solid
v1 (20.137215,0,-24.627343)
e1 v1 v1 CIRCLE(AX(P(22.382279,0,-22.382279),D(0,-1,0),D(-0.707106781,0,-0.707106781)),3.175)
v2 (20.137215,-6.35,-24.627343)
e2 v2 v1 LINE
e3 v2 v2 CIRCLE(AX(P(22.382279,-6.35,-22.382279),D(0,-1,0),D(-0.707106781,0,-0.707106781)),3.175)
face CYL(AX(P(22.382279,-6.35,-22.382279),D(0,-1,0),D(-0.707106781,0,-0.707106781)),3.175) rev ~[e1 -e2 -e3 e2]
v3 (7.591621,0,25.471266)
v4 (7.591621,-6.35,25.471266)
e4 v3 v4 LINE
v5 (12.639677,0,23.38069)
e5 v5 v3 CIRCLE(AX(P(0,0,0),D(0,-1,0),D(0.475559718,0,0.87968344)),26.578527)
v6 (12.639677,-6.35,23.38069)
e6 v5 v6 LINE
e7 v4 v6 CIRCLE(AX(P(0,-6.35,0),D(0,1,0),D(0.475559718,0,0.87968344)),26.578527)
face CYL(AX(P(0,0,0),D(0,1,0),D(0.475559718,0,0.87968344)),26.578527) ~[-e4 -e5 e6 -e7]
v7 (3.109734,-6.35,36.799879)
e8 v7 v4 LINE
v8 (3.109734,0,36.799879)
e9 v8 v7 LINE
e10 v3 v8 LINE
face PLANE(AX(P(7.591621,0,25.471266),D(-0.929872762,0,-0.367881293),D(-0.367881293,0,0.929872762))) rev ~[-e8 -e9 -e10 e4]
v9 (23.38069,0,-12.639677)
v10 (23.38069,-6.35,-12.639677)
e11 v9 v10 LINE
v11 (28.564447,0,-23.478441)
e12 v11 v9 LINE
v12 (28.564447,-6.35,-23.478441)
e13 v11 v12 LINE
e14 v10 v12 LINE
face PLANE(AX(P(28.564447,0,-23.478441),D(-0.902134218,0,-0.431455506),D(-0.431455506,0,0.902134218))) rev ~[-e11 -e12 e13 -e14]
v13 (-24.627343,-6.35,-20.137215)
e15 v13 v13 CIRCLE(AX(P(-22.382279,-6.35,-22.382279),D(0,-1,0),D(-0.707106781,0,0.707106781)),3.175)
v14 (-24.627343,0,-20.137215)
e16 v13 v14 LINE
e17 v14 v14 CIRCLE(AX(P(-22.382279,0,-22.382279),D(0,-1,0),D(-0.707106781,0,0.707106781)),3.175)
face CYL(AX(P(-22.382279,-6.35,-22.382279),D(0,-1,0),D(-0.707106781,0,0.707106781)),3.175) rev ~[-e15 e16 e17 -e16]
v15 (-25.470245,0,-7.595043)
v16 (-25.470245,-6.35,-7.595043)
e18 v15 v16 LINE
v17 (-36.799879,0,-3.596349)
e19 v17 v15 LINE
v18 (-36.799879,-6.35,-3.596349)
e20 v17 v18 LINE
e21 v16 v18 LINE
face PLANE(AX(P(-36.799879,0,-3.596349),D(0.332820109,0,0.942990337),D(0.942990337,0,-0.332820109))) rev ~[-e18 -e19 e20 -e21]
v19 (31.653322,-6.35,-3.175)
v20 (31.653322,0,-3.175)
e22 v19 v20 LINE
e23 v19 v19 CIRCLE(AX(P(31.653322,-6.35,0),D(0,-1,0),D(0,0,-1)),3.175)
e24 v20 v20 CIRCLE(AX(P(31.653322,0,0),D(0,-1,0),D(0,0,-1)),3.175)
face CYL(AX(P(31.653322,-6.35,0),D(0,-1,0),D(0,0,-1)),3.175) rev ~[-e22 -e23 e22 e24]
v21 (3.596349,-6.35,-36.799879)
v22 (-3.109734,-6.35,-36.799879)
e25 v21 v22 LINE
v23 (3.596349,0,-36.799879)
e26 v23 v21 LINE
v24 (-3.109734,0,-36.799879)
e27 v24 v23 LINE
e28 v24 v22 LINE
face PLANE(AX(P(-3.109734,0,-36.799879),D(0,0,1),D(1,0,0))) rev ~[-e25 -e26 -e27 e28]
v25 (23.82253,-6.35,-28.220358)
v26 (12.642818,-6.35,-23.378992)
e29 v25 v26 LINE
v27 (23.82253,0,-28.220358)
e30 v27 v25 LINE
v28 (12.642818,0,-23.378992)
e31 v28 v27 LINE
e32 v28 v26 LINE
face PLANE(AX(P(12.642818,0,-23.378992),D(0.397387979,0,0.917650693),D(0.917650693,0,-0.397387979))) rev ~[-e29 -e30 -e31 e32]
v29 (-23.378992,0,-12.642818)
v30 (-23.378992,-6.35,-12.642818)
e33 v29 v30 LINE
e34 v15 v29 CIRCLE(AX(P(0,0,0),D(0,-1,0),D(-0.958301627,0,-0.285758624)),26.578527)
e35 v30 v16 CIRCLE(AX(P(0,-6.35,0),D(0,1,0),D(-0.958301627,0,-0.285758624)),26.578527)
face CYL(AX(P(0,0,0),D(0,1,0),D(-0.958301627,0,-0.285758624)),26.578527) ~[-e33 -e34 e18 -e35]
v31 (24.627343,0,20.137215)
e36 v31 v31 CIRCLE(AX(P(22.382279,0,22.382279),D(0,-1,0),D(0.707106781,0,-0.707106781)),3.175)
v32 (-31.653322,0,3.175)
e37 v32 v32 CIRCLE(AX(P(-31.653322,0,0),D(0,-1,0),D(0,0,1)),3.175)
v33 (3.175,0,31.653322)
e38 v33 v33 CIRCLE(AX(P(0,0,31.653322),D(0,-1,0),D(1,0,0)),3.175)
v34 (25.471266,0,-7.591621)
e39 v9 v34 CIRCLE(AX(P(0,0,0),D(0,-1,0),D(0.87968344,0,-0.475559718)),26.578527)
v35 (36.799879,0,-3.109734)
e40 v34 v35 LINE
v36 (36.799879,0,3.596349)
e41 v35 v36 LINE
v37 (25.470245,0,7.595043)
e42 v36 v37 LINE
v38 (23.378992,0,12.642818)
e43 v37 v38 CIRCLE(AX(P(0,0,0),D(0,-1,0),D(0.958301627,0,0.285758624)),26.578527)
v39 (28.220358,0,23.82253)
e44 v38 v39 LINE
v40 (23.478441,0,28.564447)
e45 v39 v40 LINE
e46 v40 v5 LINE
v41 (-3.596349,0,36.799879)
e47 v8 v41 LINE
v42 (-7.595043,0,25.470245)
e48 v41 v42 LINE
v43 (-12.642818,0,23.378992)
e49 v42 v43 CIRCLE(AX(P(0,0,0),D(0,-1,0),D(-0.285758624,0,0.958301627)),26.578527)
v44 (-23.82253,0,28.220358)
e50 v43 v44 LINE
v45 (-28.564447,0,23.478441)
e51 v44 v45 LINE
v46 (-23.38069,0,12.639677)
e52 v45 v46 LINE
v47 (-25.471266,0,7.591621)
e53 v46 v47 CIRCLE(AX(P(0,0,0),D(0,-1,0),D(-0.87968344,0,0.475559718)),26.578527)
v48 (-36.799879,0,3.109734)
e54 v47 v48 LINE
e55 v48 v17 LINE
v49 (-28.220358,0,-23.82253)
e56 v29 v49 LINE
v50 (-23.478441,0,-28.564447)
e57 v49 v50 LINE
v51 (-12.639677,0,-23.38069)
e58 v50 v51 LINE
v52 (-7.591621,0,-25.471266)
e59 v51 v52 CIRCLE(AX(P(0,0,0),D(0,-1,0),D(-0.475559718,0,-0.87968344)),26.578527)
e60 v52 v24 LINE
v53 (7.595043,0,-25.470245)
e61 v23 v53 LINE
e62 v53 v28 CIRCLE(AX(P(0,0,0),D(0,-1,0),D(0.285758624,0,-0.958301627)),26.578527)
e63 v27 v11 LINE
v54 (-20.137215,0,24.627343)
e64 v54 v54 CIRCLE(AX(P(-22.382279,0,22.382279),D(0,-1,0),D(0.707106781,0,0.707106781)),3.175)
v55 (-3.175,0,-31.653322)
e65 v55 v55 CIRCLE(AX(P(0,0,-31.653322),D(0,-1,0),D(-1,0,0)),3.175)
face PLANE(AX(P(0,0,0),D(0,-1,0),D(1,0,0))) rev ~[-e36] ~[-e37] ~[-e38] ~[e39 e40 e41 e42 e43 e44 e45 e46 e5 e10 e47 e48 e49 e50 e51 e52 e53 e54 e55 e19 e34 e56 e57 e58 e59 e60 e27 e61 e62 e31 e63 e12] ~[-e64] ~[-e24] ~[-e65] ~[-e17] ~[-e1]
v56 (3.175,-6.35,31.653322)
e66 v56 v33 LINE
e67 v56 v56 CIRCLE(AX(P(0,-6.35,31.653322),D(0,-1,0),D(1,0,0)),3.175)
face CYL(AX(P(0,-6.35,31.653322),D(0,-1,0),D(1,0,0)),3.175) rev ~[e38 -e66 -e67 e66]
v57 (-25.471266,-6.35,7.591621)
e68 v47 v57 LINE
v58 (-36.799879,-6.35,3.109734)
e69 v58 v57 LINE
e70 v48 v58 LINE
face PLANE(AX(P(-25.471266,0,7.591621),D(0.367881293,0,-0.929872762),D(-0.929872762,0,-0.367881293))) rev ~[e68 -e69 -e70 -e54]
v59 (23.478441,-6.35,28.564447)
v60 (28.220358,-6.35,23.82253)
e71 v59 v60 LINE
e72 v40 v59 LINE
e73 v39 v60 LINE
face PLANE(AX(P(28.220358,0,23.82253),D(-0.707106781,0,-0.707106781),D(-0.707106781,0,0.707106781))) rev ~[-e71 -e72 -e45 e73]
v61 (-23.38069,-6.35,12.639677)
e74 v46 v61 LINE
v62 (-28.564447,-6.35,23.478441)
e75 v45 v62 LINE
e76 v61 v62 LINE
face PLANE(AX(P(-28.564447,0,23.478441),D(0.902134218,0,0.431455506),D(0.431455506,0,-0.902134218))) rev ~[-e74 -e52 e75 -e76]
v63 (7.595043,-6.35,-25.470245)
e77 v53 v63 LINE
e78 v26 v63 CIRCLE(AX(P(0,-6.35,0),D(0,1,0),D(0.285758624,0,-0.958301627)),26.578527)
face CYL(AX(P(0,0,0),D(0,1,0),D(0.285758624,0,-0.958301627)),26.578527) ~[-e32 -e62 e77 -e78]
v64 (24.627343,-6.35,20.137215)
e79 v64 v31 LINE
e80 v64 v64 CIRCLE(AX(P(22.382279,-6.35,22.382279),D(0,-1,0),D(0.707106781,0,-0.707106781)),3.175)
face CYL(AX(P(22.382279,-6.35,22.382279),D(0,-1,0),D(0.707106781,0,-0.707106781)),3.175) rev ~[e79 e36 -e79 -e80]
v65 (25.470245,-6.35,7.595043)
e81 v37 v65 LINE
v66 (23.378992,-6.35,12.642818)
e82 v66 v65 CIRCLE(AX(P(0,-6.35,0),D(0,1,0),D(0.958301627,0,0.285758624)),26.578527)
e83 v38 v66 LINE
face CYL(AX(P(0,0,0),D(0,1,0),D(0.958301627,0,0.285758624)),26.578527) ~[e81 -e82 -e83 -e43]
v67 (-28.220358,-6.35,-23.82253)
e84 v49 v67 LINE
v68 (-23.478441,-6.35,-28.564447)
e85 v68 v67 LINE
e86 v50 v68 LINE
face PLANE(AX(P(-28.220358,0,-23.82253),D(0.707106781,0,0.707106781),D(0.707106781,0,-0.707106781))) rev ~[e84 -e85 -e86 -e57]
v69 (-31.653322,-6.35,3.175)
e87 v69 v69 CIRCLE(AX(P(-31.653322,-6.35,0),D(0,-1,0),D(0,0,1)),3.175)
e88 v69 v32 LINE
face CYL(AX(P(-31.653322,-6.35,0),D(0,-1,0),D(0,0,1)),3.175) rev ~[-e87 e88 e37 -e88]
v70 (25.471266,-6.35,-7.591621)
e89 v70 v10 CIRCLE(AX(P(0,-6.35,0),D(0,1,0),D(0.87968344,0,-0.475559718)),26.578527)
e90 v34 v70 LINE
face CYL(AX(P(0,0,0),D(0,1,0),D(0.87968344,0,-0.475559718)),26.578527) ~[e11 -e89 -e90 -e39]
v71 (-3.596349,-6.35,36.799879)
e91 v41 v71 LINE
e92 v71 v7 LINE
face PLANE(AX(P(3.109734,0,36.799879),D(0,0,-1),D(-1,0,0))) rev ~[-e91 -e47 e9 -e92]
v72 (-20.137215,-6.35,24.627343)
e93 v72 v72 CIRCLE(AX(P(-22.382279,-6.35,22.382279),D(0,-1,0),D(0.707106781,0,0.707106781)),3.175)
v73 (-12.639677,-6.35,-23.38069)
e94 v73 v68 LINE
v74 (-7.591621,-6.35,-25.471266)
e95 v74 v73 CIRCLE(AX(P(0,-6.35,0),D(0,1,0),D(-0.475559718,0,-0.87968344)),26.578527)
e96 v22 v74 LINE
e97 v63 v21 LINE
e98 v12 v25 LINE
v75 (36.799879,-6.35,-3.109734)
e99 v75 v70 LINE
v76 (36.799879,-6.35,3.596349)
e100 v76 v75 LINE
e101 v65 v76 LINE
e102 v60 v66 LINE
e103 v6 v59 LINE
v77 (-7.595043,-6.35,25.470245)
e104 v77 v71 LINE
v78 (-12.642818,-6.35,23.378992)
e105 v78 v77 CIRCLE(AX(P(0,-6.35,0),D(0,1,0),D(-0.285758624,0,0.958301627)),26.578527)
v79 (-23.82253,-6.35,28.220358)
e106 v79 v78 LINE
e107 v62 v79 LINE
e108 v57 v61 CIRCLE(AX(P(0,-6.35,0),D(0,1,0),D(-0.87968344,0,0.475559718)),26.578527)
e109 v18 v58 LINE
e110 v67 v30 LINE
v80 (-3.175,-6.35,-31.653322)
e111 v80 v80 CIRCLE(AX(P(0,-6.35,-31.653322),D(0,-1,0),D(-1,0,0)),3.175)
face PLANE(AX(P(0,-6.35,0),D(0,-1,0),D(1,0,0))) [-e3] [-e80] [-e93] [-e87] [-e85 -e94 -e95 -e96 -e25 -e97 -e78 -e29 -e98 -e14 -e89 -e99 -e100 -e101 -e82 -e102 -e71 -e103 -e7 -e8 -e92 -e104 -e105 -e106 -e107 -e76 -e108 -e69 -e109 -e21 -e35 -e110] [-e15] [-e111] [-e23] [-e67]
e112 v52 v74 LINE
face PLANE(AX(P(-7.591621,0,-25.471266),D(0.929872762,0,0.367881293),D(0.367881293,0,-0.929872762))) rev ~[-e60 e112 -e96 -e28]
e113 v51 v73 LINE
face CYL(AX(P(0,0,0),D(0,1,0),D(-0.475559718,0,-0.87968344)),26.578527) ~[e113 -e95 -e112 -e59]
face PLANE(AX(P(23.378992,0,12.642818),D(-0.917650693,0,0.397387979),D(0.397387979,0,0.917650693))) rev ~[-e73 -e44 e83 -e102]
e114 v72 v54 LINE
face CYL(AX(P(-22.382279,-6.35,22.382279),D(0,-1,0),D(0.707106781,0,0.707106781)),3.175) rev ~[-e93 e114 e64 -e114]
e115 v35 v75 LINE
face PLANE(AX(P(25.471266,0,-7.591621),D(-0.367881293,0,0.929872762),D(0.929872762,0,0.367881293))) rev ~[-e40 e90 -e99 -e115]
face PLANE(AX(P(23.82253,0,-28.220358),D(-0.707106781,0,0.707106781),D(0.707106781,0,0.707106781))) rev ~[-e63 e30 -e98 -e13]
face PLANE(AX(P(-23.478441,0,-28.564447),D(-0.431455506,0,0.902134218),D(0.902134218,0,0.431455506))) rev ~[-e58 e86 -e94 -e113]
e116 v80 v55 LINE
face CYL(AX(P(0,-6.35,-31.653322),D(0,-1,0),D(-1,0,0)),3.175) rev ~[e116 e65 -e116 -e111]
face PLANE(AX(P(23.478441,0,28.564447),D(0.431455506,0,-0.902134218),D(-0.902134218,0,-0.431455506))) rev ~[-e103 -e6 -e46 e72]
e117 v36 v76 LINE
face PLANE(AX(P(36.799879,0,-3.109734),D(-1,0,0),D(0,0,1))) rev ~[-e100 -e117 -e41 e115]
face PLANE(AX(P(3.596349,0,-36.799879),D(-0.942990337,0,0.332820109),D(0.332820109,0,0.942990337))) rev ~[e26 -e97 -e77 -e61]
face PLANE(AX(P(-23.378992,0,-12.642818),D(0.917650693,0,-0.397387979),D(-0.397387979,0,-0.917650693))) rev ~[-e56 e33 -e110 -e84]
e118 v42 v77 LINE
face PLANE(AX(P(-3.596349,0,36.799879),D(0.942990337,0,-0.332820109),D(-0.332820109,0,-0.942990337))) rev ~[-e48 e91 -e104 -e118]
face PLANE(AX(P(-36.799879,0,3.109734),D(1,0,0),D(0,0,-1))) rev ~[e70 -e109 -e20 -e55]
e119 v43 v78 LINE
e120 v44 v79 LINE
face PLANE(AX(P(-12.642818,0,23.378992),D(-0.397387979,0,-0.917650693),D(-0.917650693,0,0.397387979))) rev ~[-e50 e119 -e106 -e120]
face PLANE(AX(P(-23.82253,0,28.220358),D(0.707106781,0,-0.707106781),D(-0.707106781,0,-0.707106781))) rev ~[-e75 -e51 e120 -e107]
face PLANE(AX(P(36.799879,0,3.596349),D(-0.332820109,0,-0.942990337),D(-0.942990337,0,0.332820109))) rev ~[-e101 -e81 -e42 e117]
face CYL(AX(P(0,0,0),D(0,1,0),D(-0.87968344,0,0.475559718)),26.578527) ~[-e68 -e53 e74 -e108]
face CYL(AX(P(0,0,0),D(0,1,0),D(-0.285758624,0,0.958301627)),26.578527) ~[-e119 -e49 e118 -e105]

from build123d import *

# Parameters (mm, degrees)
F0_R            = 38.1
F1_DEPTH        = 6.35
F2_R            = 3.175
F3_DEPTH        = 6.351
F3_COPIES_COUNT = 8
F5_DEPTH        = 25.4


# Not quite as in the source:
# - a pattern or mirror of a feature is missing from the dataset's text; its kind, count and spacing are read off the source's solid


with BuildPart() as f1:
    # F0 (on Front) → F1 (new body)
    with BuildSketch(Plane.XZ):
        Circle(F0_R)
    extrude(amount=F1_DEPTH)

    # F2 (on face) → F3 (cut, through all)
    with BuildSketch(Plane.XZ.offset(6.35)):
        with Locations((0, 31.6533222795)):
            Circle(F2_R)
    f3 = extrude(amount=-F3_DEPTH, mode=Mode.SUBTRACT)

    # F3_copies: F3 ×8 about axis
    f3_copies_axis = Axis((0, 0, 0), (0, 1, 0))
    for i in range(1, F3_COPIES_COUNT):
        add(f3.rotate(f3_copies_axis, i * 360 / F3_COPIES_COUNT), mode=Mode.SUBTRACT)

    # F4 (on Front) → F5 (intersect)
    with BuildSketch(Plane.XZ):
        with BuildLine():
            Line((3.1097339764, 36.7998792025), (-3.5963490721, 36.7998792025))
            Line((-3.5963490721, 36.7998792025), (-7.5950432294, 25.4702454258))
            ThreePointArc((-7.5950432294, 25.4702454258), (-10.1728112394, 24.5546735917), (-12.6428176097, 23.378991565))
            Line((-12.6428176097, 23.378991565), (-23.8225301486, 28.2203581134))
            Line((-23.8225301486, 28.2203581134), (-28.5644469474, 23.4784413146))
            Line((-28.5644469474, 23.4784413146), (-23.38068983, 12.6396766882))
            ThreePointArc((-23.38068983, 12.6396766882), (-24.5560400177, 10.1695123954), (-25.4712655381, 7.5916214078))
            Line((-25.4712655381, 7.5916214078), (-36.7998792025, 3.1097339764))
            Line((-36.7998792025, 3.1097339764), (-36.7998792025, -3.5963490721))
            Line((-36.7998792025, -3.5963490721), (-25.4702454258, -7.5950432294))
            ThreePointArc((-25.4702454258, -7.5950432294), (-24.5546735917, -10.1728112394), (-23.378991565, -12.6428176097))
            Line((-23.378991565, -12.6428176097), (-28.2203581134, -23.8225301486))
            Line((-28.2203581134, -23.8225301486), (-23.4784413146, -28.5644469474))
            Line((-23.4784413146, -28.5644469474), (-12.6396766882, -23.38068983))
            ThreePointArc((-12.6396766882, -23.38068983), (-10.1695123954, -24.5560400177), (-7.5916214078, -25.4712655381))
            Line((-7.5916214078, -25.4712655381), (-3.1097339764, -36.7998792025))
            Line((-3.1097339764, -36.7998792025), (3.5963490721, -36.7998792025))
            Line((3.5963490721, -36.7998792025), (7.5950432294, -25.4702454258))
            ThreePointArc((7.5950432294, -25.4702454258), (10.1728112394, -24.5546735917), (12.6428176097, -23.378991565))
            Line((12.6428176097, -23.378991565), (23.8225301486, -28.2203581134))
            Line((23.8225301486, -28.2203581134), (28.5644469474, -23.4784413146))
            Line((28.5644469474, -23.4784413146), (23.38068983, -12.6396766882))
            ThreePointArc((23.38068983, -12.6396766882), (24.5560400177, -10.1695123954), (25.4712655381, -7.5916214078))
            Line((25.4712655381, -7.5916214078), (36.7998792025, -3.1097339764))
            Line((36.7998792025, -3.1097339764), (36.7998792025, 3.5963490721))
            Line((36.7998792025, 3.5963490721), (25.4702454258, 7.5950432294))
            ThreePointArc((25.4702454258, 7.5950432294), (24.5546735917, 10.1728112394), (23.378991565, 12.6428176097))
            Line((23.378991565, 12.6428176097), (28.2203581134, 23.8225301486))
            Line((28.2203581134, 23.8225301486), (23.4784413146, 28.5644469474))
            Line((23.4784413146, 28.5644469474), (12.6396766882, 23.38068983))
            ThreePointArc((12.6396766882, 23.38068983), (10.1695123954, 24.5560400177), (7.5916214078, 25.4712655381))
            Line((7.5916214078, 25.4712655381), (3.1097339764, 36.7998792025))
        make_face()
    extrude(amount=F5_DEPTH, mode=Mode.INTERSECT)


solid = f1.part
